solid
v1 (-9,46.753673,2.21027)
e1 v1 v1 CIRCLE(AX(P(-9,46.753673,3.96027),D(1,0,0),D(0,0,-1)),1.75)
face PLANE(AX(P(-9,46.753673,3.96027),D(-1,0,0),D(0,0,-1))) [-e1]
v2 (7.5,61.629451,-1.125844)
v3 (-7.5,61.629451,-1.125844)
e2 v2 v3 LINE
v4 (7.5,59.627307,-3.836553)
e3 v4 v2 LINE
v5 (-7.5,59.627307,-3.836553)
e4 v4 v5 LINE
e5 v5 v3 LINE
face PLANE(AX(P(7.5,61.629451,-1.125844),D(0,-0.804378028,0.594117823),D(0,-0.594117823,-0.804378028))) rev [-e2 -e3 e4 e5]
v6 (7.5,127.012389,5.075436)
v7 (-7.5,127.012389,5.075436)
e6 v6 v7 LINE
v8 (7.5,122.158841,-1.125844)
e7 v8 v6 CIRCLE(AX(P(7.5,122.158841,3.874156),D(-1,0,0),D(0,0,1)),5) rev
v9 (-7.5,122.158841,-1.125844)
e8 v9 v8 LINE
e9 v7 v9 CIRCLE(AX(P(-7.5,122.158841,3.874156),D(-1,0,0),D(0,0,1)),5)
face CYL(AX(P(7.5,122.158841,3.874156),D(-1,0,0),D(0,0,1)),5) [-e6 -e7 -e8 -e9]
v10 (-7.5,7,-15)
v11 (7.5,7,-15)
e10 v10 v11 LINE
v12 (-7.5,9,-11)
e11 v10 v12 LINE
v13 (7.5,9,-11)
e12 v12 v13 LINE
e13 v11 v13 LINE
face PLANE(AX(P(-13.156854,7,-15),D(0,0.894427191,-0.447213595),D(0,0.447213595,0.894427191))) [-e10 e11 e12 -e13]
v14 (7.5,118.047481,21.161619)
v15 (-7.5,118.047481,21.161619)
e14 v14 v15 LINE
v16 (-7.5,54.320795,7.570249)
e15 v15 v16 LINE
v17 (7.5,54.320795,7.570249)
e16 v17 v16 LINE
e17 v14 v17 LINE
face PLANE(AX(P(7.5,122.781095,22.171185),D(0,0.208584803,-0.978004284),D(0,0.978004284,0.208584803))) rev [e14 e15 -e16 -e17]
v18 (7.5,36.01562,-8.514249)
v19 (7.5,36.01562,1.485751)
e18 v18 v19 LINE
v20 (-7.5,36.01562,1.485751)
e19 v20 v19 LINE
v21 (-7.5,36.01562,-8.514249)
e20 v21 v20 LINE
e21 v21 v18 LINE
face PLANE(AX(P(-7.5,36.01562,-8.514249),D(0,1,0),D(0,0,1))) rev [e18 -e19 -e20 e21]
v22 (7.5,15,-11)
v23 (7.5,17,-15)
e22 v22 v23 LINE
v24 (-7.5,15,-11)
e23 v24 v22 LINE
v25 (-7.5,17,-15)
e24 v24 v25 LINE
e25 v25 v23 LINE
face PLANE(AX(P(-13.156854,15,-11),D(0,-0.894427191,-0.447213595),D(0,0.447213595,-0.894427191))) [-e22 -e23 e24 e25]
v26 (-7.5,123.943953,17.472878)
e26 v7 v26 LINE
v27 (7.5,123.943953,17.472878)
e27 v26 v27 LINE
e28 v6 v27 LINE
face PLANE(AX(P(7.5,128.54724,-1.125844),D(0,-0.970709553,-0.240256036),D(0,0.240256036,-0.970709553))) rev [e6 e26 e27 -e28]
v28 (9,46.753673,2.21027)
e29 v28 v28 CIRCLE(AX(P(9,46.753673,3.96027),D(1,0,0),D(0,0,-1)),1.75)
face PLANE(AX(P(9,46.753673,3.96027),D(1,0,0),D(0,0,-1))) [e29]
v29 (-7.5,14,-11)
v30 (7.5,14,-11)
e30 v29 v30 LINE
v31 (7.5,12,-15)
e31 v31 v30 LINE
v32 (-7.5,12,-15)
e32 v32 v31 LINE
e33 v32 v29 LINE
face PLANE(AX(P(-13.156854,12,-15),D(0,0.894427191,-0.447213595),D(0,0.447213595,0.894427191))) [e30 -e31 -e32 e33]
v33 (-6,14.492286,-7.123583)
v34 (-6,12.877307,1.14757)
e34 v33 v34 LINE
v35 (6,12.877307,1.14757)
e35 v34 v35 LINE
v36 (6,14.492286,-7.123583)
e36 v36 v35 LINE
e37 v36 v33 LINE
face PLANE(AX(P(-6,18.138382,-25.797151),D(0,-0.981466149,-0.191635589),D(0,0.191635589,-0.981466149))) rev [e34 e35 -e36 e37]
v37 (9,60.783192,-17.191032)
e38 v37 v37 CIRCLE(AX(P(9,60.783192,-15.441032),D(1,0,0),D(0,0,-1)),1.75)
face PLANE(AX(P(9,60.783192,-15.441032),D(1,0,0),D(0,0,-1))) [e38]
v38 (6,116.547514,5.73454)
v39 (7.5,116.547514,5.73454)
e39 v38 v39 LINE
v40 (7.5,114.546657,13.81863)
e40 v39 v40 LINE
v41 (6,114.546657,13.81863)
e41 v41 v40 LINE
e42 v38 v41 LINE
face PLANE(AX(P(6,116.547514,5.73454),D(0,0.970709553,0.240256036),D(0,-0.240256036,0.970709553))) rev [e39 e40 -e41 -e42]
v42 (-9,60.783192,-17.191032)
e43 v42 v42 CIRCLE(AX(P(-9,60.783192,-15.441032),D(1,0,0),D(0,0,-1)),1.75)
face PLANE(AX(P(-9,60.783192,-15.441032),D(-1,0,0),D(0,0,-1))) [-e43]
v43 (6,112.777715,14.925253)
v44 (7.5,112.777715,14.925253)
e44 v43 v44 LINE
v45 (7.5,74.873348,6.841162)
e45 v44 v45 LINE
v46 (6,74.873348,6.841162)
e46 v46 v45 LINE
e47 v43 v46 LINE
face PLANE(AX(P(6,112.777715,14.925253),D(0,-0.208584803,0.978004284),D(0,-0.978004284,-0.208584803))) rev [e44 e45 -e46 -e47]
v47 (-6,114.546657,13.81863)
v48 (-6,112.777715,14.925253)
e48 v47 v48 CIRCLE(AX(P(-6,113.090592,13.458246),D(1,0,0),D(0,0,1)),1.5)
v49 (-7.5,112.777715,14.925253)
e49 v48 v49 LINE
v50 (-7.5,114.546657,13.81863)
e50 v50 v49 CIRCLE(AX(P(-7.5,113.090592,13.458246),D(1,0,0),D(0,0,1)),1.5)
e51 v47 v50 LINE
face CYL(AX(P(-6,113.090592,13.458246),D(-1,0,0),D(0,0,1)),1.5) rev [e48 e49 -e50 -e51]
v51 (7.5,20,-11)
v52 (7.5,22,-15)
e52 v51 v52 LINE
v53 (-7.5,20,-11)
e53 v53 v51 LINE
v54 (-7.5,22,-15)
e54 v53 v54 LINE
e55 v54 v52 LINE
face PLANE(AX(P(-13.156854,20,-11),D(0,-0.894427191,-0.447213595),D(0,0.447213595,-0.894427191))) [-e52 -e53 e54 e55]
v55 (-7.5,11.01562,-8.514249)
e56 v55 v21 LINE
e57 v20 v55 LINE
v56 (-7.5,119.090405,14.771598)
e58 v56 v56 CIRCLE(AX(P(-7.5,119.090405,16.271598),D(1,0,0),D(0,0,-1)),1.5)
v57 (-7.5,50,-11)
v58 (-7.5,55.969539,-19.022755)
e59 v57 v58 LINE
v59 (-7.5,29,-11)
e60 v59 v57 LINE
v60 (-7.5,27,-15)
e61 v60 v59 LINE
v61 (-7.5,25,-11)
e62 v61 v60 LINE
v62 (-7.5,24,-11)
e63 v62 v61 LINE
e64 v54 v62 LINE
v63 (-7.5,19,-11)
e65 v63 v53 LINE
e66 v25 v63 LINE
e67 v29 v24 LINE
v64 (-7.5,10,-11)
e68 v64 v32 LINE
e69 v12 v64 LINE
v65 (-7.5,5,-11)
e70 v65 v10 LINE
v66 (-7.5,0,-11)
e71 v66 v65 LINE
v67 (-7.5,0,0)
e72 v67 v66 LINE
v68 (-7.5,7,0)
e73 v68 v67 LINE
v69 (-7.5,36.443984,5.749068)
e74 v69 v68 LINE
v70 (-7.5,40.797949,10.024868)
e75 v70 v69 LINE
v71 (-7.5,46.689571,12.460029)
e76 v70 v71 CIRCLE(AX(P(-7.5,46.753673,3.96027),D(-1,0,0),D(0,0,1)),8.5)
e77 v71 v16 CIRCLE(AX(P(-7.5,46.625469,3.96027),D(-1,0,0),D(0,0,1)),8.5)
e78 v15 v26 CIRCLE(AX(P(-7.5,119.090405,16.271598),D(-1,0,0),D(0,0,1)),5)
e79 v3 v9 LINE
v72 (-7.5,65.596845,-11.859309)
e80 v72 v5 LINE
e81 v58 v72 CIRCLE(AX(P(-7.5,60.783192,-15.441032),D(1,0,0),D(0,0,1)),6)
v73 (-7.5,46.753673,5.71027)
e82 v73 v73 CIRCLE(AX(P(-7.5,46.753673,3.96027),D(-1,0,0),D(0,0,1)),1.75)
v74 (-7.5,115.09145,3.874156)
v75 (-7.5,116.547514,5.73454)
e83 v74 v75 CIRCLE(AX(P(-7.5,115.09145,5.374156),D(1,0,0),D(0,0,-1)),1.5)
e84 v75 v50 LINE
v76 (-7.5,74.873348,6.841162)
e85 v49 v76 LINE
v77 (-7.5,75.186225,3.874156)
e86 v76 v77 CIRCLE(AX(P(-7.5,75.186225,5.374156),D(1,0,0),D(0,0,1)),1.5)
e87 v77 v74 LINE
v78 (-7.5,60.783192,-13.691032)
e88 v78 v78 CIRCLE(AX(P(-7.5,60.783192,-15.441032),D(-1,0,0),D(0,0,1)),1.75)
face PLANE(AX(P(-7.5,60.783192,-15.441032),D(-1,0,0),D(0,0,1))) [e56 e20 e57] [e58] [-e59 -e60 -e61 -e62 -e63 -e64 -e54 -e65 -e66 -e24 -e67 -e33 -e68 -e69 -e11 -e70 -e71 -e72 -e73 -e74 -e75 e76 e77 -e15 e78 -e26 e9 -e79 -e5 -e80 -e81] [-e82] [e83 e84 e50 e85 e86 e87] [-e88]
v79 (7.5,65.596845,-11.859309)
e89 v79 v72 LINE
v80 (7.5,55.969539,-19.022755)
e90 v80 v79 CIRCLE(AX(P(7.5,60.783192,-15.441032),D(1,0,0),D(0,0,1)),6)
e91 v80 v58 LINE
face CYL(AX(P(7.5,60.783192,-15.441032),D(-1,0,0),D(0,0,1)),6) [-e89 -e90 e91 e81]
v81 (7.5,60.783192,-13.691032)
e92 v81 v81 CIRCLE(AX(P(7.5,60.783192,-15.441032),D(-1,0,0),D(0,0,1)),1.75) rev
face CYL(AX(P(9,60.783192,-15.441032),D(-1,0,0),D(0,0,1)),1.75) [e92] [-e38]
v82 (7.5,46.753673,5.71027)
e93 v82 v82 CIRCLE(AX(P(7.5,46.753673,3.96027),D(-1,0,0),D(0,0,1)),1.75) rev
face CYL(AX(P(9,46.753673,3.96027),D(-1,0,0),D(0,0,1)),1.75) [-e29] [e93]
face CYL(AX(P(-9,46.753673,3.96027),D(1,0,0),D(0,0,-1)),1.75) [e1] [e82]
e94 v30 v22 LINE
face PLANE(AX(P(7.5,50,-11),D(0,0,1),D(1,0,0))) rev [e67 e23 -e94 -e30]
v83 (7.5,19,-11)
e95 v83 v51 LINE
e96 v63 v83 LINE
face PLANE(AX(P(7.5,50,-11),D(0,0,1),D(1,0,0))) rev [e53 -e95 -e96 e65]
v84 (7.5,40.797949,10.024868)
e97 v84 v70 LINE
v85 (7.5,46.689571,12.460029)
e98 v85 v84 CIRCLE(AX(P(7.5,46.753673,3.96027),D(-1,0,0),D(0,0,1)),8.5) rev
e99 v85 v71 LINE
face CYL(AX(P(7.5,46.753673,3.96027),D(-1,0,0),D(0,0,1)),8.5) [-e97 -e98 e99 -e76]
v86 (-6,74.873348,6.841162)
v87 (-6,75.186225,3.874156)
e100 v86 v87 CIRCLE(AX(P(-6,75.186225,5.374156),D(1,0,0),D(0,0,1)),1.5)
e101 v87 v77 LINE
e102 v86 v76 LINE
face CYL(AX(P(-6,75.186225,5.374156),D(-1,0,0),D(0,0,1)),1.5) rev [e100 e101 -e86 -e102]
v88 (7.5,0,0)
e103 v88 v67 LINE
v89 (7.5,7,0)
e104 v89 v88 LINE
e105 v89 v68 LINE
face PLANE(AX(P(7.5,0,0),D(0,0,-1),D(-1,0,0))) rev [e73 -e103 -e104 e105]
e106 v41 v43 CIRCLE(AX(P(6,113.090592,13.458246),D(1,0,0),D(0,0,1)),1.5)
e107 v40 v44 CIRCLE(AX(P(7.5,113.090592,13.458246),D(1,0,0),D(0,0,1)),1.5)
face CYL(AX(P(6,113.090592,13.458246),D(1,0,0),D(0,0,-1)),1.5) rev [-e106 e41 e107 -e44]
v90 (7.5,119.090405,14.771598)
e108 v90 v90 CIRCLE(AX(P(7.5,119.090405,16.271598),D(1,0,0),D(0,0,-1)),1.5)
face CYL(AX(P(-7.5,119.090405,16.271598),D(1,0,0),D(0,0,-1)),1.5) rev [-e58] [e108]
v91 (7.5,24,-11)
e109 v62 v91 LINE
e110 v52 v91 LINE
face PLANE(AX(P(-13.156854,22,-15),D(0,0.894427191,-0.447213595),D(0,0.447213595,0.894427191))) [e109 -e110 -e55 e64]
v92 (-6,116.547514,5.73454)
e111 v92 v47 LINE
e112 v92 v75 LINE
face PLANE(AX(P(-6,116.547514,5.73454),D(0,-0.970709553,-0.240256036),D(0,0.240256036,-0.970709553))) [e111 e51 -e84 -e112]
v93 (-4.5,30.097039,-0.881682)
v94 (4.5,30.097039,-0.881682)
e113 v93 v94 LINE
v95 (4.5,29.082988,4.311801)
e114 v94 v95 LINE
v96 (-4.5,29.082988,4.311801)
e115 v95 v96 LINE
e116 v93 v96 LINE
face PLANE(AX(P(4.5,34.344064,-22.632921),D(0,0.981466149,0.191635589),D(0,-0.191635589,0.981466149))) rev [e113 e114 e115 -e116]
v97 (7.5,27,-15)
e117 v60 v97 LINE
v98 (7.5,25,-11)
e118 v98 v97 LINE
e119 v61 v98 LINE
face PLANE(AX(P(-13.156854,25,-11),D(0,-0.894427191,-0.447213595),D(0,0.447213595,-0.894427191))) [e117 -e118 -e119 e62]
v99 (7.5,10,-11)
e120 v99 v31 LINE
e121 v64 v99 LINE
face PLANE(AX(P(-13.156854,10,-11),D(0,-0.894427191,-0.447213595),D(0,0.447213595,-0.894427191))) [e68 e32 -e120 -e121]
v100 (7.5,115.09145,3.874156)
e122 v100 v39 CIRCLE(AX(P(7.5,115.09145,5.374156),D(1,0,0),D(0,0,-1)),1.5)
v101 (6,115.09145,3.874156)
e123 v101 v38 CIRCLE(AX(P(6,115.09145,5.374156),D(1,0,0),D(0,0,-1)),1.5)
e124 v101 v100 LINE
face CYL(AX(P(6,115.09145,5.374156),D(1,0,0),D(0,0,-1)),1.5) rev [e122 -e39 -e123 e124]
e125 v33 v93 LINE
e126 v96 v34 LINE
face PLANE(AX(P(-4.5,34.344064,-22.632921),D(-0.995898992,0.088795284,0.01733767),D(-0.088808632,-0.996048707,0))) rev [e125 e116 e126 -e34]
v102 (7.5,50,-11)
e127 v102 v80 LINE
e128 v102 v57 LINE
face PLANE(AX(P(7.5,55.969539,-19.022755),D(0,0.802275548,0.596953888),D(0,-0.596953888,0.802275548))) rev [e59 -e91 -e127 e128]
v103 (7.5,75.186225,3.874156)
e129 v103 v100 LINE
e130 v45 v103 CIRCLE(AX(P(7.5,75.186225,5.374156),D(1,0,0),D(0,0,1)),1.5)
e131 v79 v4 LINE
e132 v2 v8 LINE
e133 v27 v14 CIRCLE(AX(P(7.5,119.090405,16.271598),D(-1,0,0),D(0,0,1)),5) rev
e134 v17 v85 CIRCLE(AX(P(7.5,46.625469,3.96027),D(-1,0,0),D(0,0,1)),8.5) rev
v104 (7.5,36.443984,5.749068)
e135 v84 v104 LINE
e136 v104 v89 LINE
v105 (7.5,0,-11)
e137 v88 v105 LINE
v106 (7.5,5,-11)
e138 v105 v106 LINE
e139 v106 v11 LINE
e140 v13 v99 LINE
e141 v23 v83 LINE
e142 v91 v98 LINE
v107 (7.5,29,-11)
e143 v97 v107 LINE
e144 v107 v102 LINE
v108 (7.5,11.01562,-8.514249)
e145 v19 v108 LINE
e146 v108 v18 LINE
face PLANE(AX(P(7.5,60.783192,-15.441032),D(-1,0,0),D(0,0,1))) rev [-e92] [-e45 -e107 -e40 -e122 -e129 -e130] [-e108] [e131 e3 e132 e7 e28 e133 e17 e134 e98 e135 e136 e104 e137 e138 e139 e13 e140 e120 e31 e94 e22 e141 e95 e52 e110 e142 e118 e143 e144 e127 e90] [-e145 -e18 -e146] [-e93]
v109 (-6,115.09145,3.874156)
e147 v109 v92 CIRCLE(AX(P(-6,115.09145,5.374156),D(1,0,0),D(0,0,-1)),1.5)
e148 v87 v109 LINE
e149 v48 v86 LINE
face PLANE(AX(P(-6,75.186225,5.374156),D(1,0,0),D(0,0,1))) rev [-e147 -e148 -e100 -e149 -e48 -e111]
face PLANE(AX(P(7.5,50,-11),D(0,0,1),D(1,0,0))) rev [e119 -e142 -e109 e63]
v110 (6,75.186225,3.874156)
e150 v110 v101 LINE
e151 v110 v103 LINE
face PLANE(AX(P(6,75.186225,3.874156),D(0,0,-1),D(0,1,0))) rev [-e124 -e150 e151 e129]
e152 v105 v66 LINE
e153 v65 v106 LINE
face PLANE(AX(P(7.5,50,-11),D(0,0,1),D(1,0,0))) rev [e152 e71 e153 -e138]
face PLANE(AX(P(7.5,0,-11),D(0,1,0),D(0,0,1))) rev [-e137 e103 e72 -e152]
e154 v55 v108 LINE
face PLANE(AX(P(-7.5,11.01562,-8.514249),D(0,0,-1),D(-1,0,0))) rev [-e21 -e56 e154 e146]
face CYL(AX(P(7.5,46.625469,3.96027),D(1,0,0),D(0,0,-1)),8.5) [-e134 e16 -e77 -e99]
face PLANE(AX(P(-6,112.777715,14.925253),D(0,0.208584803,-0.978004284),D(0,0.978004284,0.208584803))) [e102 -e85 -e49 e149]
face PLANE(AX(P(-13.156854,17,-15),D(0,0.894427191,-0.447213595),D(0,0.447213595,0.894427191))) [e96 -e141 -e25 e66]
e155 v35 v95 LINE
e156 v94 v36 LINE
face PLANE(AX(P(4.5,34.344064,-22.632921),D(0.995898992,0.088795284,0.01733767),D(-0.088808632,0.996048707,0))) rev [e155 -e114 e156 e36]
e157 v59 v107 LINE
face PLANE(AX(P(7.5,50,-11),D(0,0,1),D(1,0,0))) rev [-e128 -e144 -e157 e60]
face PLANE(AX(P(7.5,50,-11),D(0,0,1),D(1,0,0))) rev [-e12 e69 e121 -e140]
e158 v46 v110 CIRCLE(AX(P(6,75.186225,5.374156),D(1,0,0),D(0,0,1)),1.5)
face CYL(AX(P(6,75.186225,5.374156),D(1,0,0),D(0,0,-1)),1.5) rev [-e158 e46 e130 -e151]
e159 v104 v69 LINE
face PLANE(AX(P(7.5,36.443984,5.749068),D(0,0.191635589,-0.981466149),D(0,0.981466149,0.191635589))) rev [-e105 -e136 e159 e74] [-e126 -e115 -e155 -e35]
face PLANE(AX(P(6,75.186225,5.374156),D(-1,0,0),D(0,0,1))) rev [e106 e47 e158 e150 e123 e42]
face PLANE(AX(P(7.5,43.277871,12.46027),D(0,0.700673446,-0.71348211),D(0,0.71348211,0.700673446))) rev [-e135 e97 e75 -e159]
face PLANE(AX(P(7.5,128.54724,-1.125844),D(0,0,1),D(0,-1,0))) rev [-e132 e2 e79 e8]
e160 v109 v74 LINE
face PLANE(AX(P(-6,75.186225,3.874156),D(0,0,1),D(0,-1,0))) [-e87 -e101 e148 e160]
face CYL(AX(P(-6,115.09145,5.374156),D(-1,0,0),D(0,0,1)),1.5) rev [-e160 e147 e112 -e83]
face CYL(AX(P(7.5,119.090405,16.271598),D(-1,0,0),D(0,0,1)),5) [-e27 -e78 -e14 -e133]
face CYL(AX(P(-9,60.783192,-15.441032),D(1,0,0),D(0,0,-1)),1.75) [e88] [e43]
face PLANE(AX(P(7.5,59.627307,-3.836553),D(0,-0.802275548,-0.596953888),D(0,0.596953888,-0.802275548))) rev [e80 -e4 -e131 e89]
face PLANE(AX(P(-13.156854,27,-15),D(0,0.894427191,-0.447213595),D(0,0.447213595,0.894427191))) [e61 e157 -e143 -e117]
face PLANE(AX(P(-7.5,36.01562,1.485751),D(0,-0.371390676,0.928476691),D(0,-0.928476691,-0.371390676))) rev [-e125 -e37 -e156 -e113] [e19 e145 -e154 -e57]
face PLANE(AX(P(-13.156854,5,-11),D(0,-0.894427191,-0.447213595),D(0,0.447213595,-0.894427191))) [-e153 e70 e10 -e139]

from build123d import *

# Parameters (mm, degrees)
BOSS_EXTRUDE1_DEPTH = 7.5
BOSS_EXTRUDE2_DEPTH = 15
LPATTERN1_COUNT     = 5
LPATTERN1_PITCH     = 5
CUT_EXTRUDE1_DEPTH  = 132.304814948
FILLET1_R           = 8.5
FILLET2_R           = 5
SKETCH4_R           = 1.5
CUT_EXTRUDE2_DEPTH  = 130.82329799
CUT_EXTRUDE3_REACH  = 131.114
SKETCH6_R           = 1.75
BOSS_EXTRUDE3_DEPTH = 1.5
SKETCH7_R           = 1.75
BOSS_EXTRUDE4_DEPTH = 1.5
CUT_EXTRUDE4_DEPTH  = 1.5


with BuildPart() as part:
    # Sketch1 → Boss-Extrude1 (new, symmetric)
    with BuildSketch(Plane(origin=(0, 0, 0), x_dir=(0, 0, -1), z_dir=(1, 0, 0))):
        with BuildLine():
            Line((1.125844004, 128.547240234), (-22.171185278, 122.781095368))
            Line((-22.171185278, 122.781095368), (-7.570249068, 54.320795472))
            Line((-7.570249068, 54.320795472), (-12.460270489, 53.277871457))
            Line((-12.460270489, 53.277871457), (-12.460270489, 43.277871457))
            Line((-12.460270489, 43.277871457), (-5.749067667, 36.443984461))
            Line((-5.749067667, 36.443984461), (0, 7))
            Line((0, 7), (0, 0))
            Line((0, 0), (11, 0))
            Line((11, 0), (11, 50))
            Line((11, 50), (19.022755483, 55.969538882))
            ThreePointArc((19.022755483, 55.969538882), (20.254685443, 64.364915501), (11.859308824, 65.596845461))
            Line((11.859308824, 65.596845461), (3.836553342, 59.627306579))
            Line((3.836553342, 59.627306579), (1.125844004, 61.629450689))
            Line((1.125844004, 61.629450689), (1.125844004, 128.547240234))
        make_face()
    extrude(amount=BOSS_EXTRUDE1_DEPTH, both=True)

    # Sketch2 → Boss-Extrude2 (add)
    with BuildSketch(Plane(origin=(7.5, 0, 0), x_dir=(0, 0, -1), z_dir=(1, 0, 0))):
        Polygon((11, 5), (15, 7), (11, 9), align=None)
    boss_extrude2 = extrude(amount=-BOSS_EXTRUDE2_DEPTH)

    # LPattern1: Boss-Extrude2 ×5
    with Locations(*[(0, i * LPATTERN1_PITCH, 0) for i in range(1, LPATTERN1_COUNT)]):
        add(boss_extrude2)

    # Sketch3 → Cut-Extrude1 (cut, through all)
    with BuildSketch(Plane(origin=(7.5, 0, 0), x_dir=(0, 0, -1), z_dir=(1, 0, 0))):
        Polygon((8.514249155, 11.015619925), (8.514249155, 36.015619925), (-1.485750845, 36.015619925), align=None)
    extrude(amount=-CUT_EXTRUDE1_DEPTH, mode=Mode.SUBTRACT)

    # Fillet1
    # the kernel refuses this fillet: 8.5 mm, written as the material it takes off along each edge
    with BuildSketch(Plane(origin=(-16.189504631, 43.277871457, 12.460270489), x_dir=(0, 1, 0), z_dir=(1, 0, 0))) as fillet1_piece_1:
        with BuildLine():
            CenterArc((FILLET1_R * 0.408917864968, -FILLET1_R), FILLET1_R, 90, 44.481059687)
            Line((-FILLET1_R * 0.29175558125, -FILLET1_R * 0.286517889667), (-FILLET1_R * 0.305769050174, -FILLET1_R * 0.27224824746))
            Line((-FILLET1_R * 0.305769050174, -FILLET1_R * 0.27224824746), (-FILLET1_R * 0.00817835729936, FILLET1_R * 0.02))
            Line((-FILLET1_R * 0.00817835729936, FILLET1_R * 0.02), (FILLET1_R * 0.408917864968, FILLET1_R * 0.02))
            Line((FILLET1_R * 0.408917864968, FILLET1_R * 0.02), (FILLET1_R * 0.408917864968, 0))
        make_face()
    extrude(amount=32.379009261, mode=Mode.SUBTRACT)
    with BuildSketch(Plane(origin=(-24.131006979, 53.277871457, 12.460270489), x_dir=(0, 0.20858480299843193, -0.9780042842227765), z_dir=(1, 0, 0))) as fillet1_piece_2:
        with BuildLine():
            CenterArc((6.92544629, -8.279049256), FILLET1_R, 103.092457682, 64.868111345)
            Line((-1.387590126, -6.506078431), (-1.553850854, -6.470619014))
            Line((-1.553850854, -6.470619014), (-0.166260728, 0.035459417))
            Line((-0.166260728, 0.035459417), (0, 0.17))
            ThreePointArc((0, 0.17), (2.5, 0.17), (4.961491074, 0.165580985))
            Line((4.961491074, 0.165580985), (5, 0))
        make_face()
    extrude(amount=48.262013958, mode=Mode.SUBTRACT)

    # Fillet2
    fillet2_edges = [part.edges().sort_by_distance(p)[0] for p in [
        (0, 122.781095368, 22.171185278),
        (0, 128.547240234, -1.125844004),
    ]]
    fillet(fillet2_edges, radius=FILLET2_R)

    # Sketch4 → Cut-Extrude2 (cut, through all)
    with BuildSketch(Plane(origin=(7.5, 0, 0), x_dir=(0, 0, -1), z_dir=(1, 0, 0))):
        with Locations((-16.271597688, 119.090404926)):
            Circle(SKETCH4_R)
    extrude(amount=-CUT_EXTRUDE2_DEPTH, mode=Mode.SUBTRACT)

    # Cut-Extrude3: up to this plane
    cut_extrude3_end = Plane(origin=(-7.5, 36.015619925, 1.485750845), z_dir=(0, -0.3713906763541038, 0.9284766908852593))
    # Sketch5 → Cut-Extrude3 (cut, up to the surface)
    with BuildSketch(Plane(origin=(0, 0.257069393, -1.316586904), x_dir=(1, 0, 0), z_dir=(0, -0.19163558890630344, 0.9814661487104557)), mode=Mode.PRIVATE) as cut_extrude3_sk1:
        Polygon((4.5, 29.370263041), (-4.5, 29.370263041), (-6, 12.858555839), (6, 12.858555839), align=None)
    cut_extrude3_tool1 = split(extrude(cut_extrude3_sk1.sketch, amount=-CUT_EXTRUDE3_REACH, mode=Mode.PRIVATE), bisect_by=cut_extrude3_end, keep=Keep.BOTH, mode=Mode.PRIVATE)
    add(cut_extrude3_tool1.solids().sort_by_distance((0, 20.594298, 2.654347))[0], mode=Mode.SUBTRACT)

    # Sketch6 → Boss-Extrude3 (add)
    with BuildSketch(Plane(origin=(7.5, 0, 0), x_dir=(0, 0, -1), z_dir=(1, 0, 0))):
        with Locations(Location((15.441032154, 60.783192172, 0), (0, 0, 180))):
            Circle(SKETCH6_R)
    boss_extrude3 = extrude(amount=BOSS_EXTRUDE3_DEPTH)

    # Sketch7 → Boss-Extrude4 (add)
    with BuildSketch(Plane(origin=(7.5, 0, 0), x_dir=(0, 0, -1), z_dir=(1, 0, 0))):
        with Locations(Location((-3.960270489, 46.753673309, 0), (0, 0, 180))):
            Circle(SKETCH7_R)
    boss_extrude4 = extrude(amount=BOSS_EXTRUDE4_DEPTH)

    # Sketch8 → Cut-Extrude4 (cut)
    with BuildSketch(Plane(origin=(7.5, 0, 0), x_dir=(0, 0, -1), z_dir=(1, 0, 0))):
        with BuildLine():
            Line((-14.925252721, 112.777715187), (-6.841162422, 74.873348079))
            ThreePointArc((-6.841162422, 74.873348079), (-5.216849988, 73.694496481), (-3.874155996, 75.186225283))
            Line((-3.874155996, 75.186225283), (-3.874155996, 115.091449891))
            ThreePointArc((-3.874155996, 115.091449891), (-4.449649663, 116.272673004), (-5.73454005, 116.547514222))
            Line((-5.73454005, 116.547514222), (-13.818630348, 114.546656721))
            ThreePointArc((-13.818630348, 114.546656721), (-14.729909587, 113.886125212), (-14.925252721, 112.777715187))
        make_face()
    cut_extrude4 = extrude(amount=-CUT_EXTRUDE4_DEPTH, mode=Mode.SUBTRACT)

    # Mirror1: Boss-Extrude3, Boss-Extrude4, Cut-Extrude4 across plane
    add(boss_extrude3.mirror(Plane(origin=(0, 0, 0), x_dir=(0, 0, 1), z_dir=(1, 0, 0))))
    add(boss_extrude4.mirror(Plane(origin=(0, 0, 0), x_dir=(0, 0, 1), z_dir=(1, 0, 0))))
    add(cut_extrude4.mirror(Plane(origin=(0, 0, 0), x_dir=(0, 0, 1), z_dir=(1, 0, 0))), mode=Mode.SUBTRACT)


solid = part.part
